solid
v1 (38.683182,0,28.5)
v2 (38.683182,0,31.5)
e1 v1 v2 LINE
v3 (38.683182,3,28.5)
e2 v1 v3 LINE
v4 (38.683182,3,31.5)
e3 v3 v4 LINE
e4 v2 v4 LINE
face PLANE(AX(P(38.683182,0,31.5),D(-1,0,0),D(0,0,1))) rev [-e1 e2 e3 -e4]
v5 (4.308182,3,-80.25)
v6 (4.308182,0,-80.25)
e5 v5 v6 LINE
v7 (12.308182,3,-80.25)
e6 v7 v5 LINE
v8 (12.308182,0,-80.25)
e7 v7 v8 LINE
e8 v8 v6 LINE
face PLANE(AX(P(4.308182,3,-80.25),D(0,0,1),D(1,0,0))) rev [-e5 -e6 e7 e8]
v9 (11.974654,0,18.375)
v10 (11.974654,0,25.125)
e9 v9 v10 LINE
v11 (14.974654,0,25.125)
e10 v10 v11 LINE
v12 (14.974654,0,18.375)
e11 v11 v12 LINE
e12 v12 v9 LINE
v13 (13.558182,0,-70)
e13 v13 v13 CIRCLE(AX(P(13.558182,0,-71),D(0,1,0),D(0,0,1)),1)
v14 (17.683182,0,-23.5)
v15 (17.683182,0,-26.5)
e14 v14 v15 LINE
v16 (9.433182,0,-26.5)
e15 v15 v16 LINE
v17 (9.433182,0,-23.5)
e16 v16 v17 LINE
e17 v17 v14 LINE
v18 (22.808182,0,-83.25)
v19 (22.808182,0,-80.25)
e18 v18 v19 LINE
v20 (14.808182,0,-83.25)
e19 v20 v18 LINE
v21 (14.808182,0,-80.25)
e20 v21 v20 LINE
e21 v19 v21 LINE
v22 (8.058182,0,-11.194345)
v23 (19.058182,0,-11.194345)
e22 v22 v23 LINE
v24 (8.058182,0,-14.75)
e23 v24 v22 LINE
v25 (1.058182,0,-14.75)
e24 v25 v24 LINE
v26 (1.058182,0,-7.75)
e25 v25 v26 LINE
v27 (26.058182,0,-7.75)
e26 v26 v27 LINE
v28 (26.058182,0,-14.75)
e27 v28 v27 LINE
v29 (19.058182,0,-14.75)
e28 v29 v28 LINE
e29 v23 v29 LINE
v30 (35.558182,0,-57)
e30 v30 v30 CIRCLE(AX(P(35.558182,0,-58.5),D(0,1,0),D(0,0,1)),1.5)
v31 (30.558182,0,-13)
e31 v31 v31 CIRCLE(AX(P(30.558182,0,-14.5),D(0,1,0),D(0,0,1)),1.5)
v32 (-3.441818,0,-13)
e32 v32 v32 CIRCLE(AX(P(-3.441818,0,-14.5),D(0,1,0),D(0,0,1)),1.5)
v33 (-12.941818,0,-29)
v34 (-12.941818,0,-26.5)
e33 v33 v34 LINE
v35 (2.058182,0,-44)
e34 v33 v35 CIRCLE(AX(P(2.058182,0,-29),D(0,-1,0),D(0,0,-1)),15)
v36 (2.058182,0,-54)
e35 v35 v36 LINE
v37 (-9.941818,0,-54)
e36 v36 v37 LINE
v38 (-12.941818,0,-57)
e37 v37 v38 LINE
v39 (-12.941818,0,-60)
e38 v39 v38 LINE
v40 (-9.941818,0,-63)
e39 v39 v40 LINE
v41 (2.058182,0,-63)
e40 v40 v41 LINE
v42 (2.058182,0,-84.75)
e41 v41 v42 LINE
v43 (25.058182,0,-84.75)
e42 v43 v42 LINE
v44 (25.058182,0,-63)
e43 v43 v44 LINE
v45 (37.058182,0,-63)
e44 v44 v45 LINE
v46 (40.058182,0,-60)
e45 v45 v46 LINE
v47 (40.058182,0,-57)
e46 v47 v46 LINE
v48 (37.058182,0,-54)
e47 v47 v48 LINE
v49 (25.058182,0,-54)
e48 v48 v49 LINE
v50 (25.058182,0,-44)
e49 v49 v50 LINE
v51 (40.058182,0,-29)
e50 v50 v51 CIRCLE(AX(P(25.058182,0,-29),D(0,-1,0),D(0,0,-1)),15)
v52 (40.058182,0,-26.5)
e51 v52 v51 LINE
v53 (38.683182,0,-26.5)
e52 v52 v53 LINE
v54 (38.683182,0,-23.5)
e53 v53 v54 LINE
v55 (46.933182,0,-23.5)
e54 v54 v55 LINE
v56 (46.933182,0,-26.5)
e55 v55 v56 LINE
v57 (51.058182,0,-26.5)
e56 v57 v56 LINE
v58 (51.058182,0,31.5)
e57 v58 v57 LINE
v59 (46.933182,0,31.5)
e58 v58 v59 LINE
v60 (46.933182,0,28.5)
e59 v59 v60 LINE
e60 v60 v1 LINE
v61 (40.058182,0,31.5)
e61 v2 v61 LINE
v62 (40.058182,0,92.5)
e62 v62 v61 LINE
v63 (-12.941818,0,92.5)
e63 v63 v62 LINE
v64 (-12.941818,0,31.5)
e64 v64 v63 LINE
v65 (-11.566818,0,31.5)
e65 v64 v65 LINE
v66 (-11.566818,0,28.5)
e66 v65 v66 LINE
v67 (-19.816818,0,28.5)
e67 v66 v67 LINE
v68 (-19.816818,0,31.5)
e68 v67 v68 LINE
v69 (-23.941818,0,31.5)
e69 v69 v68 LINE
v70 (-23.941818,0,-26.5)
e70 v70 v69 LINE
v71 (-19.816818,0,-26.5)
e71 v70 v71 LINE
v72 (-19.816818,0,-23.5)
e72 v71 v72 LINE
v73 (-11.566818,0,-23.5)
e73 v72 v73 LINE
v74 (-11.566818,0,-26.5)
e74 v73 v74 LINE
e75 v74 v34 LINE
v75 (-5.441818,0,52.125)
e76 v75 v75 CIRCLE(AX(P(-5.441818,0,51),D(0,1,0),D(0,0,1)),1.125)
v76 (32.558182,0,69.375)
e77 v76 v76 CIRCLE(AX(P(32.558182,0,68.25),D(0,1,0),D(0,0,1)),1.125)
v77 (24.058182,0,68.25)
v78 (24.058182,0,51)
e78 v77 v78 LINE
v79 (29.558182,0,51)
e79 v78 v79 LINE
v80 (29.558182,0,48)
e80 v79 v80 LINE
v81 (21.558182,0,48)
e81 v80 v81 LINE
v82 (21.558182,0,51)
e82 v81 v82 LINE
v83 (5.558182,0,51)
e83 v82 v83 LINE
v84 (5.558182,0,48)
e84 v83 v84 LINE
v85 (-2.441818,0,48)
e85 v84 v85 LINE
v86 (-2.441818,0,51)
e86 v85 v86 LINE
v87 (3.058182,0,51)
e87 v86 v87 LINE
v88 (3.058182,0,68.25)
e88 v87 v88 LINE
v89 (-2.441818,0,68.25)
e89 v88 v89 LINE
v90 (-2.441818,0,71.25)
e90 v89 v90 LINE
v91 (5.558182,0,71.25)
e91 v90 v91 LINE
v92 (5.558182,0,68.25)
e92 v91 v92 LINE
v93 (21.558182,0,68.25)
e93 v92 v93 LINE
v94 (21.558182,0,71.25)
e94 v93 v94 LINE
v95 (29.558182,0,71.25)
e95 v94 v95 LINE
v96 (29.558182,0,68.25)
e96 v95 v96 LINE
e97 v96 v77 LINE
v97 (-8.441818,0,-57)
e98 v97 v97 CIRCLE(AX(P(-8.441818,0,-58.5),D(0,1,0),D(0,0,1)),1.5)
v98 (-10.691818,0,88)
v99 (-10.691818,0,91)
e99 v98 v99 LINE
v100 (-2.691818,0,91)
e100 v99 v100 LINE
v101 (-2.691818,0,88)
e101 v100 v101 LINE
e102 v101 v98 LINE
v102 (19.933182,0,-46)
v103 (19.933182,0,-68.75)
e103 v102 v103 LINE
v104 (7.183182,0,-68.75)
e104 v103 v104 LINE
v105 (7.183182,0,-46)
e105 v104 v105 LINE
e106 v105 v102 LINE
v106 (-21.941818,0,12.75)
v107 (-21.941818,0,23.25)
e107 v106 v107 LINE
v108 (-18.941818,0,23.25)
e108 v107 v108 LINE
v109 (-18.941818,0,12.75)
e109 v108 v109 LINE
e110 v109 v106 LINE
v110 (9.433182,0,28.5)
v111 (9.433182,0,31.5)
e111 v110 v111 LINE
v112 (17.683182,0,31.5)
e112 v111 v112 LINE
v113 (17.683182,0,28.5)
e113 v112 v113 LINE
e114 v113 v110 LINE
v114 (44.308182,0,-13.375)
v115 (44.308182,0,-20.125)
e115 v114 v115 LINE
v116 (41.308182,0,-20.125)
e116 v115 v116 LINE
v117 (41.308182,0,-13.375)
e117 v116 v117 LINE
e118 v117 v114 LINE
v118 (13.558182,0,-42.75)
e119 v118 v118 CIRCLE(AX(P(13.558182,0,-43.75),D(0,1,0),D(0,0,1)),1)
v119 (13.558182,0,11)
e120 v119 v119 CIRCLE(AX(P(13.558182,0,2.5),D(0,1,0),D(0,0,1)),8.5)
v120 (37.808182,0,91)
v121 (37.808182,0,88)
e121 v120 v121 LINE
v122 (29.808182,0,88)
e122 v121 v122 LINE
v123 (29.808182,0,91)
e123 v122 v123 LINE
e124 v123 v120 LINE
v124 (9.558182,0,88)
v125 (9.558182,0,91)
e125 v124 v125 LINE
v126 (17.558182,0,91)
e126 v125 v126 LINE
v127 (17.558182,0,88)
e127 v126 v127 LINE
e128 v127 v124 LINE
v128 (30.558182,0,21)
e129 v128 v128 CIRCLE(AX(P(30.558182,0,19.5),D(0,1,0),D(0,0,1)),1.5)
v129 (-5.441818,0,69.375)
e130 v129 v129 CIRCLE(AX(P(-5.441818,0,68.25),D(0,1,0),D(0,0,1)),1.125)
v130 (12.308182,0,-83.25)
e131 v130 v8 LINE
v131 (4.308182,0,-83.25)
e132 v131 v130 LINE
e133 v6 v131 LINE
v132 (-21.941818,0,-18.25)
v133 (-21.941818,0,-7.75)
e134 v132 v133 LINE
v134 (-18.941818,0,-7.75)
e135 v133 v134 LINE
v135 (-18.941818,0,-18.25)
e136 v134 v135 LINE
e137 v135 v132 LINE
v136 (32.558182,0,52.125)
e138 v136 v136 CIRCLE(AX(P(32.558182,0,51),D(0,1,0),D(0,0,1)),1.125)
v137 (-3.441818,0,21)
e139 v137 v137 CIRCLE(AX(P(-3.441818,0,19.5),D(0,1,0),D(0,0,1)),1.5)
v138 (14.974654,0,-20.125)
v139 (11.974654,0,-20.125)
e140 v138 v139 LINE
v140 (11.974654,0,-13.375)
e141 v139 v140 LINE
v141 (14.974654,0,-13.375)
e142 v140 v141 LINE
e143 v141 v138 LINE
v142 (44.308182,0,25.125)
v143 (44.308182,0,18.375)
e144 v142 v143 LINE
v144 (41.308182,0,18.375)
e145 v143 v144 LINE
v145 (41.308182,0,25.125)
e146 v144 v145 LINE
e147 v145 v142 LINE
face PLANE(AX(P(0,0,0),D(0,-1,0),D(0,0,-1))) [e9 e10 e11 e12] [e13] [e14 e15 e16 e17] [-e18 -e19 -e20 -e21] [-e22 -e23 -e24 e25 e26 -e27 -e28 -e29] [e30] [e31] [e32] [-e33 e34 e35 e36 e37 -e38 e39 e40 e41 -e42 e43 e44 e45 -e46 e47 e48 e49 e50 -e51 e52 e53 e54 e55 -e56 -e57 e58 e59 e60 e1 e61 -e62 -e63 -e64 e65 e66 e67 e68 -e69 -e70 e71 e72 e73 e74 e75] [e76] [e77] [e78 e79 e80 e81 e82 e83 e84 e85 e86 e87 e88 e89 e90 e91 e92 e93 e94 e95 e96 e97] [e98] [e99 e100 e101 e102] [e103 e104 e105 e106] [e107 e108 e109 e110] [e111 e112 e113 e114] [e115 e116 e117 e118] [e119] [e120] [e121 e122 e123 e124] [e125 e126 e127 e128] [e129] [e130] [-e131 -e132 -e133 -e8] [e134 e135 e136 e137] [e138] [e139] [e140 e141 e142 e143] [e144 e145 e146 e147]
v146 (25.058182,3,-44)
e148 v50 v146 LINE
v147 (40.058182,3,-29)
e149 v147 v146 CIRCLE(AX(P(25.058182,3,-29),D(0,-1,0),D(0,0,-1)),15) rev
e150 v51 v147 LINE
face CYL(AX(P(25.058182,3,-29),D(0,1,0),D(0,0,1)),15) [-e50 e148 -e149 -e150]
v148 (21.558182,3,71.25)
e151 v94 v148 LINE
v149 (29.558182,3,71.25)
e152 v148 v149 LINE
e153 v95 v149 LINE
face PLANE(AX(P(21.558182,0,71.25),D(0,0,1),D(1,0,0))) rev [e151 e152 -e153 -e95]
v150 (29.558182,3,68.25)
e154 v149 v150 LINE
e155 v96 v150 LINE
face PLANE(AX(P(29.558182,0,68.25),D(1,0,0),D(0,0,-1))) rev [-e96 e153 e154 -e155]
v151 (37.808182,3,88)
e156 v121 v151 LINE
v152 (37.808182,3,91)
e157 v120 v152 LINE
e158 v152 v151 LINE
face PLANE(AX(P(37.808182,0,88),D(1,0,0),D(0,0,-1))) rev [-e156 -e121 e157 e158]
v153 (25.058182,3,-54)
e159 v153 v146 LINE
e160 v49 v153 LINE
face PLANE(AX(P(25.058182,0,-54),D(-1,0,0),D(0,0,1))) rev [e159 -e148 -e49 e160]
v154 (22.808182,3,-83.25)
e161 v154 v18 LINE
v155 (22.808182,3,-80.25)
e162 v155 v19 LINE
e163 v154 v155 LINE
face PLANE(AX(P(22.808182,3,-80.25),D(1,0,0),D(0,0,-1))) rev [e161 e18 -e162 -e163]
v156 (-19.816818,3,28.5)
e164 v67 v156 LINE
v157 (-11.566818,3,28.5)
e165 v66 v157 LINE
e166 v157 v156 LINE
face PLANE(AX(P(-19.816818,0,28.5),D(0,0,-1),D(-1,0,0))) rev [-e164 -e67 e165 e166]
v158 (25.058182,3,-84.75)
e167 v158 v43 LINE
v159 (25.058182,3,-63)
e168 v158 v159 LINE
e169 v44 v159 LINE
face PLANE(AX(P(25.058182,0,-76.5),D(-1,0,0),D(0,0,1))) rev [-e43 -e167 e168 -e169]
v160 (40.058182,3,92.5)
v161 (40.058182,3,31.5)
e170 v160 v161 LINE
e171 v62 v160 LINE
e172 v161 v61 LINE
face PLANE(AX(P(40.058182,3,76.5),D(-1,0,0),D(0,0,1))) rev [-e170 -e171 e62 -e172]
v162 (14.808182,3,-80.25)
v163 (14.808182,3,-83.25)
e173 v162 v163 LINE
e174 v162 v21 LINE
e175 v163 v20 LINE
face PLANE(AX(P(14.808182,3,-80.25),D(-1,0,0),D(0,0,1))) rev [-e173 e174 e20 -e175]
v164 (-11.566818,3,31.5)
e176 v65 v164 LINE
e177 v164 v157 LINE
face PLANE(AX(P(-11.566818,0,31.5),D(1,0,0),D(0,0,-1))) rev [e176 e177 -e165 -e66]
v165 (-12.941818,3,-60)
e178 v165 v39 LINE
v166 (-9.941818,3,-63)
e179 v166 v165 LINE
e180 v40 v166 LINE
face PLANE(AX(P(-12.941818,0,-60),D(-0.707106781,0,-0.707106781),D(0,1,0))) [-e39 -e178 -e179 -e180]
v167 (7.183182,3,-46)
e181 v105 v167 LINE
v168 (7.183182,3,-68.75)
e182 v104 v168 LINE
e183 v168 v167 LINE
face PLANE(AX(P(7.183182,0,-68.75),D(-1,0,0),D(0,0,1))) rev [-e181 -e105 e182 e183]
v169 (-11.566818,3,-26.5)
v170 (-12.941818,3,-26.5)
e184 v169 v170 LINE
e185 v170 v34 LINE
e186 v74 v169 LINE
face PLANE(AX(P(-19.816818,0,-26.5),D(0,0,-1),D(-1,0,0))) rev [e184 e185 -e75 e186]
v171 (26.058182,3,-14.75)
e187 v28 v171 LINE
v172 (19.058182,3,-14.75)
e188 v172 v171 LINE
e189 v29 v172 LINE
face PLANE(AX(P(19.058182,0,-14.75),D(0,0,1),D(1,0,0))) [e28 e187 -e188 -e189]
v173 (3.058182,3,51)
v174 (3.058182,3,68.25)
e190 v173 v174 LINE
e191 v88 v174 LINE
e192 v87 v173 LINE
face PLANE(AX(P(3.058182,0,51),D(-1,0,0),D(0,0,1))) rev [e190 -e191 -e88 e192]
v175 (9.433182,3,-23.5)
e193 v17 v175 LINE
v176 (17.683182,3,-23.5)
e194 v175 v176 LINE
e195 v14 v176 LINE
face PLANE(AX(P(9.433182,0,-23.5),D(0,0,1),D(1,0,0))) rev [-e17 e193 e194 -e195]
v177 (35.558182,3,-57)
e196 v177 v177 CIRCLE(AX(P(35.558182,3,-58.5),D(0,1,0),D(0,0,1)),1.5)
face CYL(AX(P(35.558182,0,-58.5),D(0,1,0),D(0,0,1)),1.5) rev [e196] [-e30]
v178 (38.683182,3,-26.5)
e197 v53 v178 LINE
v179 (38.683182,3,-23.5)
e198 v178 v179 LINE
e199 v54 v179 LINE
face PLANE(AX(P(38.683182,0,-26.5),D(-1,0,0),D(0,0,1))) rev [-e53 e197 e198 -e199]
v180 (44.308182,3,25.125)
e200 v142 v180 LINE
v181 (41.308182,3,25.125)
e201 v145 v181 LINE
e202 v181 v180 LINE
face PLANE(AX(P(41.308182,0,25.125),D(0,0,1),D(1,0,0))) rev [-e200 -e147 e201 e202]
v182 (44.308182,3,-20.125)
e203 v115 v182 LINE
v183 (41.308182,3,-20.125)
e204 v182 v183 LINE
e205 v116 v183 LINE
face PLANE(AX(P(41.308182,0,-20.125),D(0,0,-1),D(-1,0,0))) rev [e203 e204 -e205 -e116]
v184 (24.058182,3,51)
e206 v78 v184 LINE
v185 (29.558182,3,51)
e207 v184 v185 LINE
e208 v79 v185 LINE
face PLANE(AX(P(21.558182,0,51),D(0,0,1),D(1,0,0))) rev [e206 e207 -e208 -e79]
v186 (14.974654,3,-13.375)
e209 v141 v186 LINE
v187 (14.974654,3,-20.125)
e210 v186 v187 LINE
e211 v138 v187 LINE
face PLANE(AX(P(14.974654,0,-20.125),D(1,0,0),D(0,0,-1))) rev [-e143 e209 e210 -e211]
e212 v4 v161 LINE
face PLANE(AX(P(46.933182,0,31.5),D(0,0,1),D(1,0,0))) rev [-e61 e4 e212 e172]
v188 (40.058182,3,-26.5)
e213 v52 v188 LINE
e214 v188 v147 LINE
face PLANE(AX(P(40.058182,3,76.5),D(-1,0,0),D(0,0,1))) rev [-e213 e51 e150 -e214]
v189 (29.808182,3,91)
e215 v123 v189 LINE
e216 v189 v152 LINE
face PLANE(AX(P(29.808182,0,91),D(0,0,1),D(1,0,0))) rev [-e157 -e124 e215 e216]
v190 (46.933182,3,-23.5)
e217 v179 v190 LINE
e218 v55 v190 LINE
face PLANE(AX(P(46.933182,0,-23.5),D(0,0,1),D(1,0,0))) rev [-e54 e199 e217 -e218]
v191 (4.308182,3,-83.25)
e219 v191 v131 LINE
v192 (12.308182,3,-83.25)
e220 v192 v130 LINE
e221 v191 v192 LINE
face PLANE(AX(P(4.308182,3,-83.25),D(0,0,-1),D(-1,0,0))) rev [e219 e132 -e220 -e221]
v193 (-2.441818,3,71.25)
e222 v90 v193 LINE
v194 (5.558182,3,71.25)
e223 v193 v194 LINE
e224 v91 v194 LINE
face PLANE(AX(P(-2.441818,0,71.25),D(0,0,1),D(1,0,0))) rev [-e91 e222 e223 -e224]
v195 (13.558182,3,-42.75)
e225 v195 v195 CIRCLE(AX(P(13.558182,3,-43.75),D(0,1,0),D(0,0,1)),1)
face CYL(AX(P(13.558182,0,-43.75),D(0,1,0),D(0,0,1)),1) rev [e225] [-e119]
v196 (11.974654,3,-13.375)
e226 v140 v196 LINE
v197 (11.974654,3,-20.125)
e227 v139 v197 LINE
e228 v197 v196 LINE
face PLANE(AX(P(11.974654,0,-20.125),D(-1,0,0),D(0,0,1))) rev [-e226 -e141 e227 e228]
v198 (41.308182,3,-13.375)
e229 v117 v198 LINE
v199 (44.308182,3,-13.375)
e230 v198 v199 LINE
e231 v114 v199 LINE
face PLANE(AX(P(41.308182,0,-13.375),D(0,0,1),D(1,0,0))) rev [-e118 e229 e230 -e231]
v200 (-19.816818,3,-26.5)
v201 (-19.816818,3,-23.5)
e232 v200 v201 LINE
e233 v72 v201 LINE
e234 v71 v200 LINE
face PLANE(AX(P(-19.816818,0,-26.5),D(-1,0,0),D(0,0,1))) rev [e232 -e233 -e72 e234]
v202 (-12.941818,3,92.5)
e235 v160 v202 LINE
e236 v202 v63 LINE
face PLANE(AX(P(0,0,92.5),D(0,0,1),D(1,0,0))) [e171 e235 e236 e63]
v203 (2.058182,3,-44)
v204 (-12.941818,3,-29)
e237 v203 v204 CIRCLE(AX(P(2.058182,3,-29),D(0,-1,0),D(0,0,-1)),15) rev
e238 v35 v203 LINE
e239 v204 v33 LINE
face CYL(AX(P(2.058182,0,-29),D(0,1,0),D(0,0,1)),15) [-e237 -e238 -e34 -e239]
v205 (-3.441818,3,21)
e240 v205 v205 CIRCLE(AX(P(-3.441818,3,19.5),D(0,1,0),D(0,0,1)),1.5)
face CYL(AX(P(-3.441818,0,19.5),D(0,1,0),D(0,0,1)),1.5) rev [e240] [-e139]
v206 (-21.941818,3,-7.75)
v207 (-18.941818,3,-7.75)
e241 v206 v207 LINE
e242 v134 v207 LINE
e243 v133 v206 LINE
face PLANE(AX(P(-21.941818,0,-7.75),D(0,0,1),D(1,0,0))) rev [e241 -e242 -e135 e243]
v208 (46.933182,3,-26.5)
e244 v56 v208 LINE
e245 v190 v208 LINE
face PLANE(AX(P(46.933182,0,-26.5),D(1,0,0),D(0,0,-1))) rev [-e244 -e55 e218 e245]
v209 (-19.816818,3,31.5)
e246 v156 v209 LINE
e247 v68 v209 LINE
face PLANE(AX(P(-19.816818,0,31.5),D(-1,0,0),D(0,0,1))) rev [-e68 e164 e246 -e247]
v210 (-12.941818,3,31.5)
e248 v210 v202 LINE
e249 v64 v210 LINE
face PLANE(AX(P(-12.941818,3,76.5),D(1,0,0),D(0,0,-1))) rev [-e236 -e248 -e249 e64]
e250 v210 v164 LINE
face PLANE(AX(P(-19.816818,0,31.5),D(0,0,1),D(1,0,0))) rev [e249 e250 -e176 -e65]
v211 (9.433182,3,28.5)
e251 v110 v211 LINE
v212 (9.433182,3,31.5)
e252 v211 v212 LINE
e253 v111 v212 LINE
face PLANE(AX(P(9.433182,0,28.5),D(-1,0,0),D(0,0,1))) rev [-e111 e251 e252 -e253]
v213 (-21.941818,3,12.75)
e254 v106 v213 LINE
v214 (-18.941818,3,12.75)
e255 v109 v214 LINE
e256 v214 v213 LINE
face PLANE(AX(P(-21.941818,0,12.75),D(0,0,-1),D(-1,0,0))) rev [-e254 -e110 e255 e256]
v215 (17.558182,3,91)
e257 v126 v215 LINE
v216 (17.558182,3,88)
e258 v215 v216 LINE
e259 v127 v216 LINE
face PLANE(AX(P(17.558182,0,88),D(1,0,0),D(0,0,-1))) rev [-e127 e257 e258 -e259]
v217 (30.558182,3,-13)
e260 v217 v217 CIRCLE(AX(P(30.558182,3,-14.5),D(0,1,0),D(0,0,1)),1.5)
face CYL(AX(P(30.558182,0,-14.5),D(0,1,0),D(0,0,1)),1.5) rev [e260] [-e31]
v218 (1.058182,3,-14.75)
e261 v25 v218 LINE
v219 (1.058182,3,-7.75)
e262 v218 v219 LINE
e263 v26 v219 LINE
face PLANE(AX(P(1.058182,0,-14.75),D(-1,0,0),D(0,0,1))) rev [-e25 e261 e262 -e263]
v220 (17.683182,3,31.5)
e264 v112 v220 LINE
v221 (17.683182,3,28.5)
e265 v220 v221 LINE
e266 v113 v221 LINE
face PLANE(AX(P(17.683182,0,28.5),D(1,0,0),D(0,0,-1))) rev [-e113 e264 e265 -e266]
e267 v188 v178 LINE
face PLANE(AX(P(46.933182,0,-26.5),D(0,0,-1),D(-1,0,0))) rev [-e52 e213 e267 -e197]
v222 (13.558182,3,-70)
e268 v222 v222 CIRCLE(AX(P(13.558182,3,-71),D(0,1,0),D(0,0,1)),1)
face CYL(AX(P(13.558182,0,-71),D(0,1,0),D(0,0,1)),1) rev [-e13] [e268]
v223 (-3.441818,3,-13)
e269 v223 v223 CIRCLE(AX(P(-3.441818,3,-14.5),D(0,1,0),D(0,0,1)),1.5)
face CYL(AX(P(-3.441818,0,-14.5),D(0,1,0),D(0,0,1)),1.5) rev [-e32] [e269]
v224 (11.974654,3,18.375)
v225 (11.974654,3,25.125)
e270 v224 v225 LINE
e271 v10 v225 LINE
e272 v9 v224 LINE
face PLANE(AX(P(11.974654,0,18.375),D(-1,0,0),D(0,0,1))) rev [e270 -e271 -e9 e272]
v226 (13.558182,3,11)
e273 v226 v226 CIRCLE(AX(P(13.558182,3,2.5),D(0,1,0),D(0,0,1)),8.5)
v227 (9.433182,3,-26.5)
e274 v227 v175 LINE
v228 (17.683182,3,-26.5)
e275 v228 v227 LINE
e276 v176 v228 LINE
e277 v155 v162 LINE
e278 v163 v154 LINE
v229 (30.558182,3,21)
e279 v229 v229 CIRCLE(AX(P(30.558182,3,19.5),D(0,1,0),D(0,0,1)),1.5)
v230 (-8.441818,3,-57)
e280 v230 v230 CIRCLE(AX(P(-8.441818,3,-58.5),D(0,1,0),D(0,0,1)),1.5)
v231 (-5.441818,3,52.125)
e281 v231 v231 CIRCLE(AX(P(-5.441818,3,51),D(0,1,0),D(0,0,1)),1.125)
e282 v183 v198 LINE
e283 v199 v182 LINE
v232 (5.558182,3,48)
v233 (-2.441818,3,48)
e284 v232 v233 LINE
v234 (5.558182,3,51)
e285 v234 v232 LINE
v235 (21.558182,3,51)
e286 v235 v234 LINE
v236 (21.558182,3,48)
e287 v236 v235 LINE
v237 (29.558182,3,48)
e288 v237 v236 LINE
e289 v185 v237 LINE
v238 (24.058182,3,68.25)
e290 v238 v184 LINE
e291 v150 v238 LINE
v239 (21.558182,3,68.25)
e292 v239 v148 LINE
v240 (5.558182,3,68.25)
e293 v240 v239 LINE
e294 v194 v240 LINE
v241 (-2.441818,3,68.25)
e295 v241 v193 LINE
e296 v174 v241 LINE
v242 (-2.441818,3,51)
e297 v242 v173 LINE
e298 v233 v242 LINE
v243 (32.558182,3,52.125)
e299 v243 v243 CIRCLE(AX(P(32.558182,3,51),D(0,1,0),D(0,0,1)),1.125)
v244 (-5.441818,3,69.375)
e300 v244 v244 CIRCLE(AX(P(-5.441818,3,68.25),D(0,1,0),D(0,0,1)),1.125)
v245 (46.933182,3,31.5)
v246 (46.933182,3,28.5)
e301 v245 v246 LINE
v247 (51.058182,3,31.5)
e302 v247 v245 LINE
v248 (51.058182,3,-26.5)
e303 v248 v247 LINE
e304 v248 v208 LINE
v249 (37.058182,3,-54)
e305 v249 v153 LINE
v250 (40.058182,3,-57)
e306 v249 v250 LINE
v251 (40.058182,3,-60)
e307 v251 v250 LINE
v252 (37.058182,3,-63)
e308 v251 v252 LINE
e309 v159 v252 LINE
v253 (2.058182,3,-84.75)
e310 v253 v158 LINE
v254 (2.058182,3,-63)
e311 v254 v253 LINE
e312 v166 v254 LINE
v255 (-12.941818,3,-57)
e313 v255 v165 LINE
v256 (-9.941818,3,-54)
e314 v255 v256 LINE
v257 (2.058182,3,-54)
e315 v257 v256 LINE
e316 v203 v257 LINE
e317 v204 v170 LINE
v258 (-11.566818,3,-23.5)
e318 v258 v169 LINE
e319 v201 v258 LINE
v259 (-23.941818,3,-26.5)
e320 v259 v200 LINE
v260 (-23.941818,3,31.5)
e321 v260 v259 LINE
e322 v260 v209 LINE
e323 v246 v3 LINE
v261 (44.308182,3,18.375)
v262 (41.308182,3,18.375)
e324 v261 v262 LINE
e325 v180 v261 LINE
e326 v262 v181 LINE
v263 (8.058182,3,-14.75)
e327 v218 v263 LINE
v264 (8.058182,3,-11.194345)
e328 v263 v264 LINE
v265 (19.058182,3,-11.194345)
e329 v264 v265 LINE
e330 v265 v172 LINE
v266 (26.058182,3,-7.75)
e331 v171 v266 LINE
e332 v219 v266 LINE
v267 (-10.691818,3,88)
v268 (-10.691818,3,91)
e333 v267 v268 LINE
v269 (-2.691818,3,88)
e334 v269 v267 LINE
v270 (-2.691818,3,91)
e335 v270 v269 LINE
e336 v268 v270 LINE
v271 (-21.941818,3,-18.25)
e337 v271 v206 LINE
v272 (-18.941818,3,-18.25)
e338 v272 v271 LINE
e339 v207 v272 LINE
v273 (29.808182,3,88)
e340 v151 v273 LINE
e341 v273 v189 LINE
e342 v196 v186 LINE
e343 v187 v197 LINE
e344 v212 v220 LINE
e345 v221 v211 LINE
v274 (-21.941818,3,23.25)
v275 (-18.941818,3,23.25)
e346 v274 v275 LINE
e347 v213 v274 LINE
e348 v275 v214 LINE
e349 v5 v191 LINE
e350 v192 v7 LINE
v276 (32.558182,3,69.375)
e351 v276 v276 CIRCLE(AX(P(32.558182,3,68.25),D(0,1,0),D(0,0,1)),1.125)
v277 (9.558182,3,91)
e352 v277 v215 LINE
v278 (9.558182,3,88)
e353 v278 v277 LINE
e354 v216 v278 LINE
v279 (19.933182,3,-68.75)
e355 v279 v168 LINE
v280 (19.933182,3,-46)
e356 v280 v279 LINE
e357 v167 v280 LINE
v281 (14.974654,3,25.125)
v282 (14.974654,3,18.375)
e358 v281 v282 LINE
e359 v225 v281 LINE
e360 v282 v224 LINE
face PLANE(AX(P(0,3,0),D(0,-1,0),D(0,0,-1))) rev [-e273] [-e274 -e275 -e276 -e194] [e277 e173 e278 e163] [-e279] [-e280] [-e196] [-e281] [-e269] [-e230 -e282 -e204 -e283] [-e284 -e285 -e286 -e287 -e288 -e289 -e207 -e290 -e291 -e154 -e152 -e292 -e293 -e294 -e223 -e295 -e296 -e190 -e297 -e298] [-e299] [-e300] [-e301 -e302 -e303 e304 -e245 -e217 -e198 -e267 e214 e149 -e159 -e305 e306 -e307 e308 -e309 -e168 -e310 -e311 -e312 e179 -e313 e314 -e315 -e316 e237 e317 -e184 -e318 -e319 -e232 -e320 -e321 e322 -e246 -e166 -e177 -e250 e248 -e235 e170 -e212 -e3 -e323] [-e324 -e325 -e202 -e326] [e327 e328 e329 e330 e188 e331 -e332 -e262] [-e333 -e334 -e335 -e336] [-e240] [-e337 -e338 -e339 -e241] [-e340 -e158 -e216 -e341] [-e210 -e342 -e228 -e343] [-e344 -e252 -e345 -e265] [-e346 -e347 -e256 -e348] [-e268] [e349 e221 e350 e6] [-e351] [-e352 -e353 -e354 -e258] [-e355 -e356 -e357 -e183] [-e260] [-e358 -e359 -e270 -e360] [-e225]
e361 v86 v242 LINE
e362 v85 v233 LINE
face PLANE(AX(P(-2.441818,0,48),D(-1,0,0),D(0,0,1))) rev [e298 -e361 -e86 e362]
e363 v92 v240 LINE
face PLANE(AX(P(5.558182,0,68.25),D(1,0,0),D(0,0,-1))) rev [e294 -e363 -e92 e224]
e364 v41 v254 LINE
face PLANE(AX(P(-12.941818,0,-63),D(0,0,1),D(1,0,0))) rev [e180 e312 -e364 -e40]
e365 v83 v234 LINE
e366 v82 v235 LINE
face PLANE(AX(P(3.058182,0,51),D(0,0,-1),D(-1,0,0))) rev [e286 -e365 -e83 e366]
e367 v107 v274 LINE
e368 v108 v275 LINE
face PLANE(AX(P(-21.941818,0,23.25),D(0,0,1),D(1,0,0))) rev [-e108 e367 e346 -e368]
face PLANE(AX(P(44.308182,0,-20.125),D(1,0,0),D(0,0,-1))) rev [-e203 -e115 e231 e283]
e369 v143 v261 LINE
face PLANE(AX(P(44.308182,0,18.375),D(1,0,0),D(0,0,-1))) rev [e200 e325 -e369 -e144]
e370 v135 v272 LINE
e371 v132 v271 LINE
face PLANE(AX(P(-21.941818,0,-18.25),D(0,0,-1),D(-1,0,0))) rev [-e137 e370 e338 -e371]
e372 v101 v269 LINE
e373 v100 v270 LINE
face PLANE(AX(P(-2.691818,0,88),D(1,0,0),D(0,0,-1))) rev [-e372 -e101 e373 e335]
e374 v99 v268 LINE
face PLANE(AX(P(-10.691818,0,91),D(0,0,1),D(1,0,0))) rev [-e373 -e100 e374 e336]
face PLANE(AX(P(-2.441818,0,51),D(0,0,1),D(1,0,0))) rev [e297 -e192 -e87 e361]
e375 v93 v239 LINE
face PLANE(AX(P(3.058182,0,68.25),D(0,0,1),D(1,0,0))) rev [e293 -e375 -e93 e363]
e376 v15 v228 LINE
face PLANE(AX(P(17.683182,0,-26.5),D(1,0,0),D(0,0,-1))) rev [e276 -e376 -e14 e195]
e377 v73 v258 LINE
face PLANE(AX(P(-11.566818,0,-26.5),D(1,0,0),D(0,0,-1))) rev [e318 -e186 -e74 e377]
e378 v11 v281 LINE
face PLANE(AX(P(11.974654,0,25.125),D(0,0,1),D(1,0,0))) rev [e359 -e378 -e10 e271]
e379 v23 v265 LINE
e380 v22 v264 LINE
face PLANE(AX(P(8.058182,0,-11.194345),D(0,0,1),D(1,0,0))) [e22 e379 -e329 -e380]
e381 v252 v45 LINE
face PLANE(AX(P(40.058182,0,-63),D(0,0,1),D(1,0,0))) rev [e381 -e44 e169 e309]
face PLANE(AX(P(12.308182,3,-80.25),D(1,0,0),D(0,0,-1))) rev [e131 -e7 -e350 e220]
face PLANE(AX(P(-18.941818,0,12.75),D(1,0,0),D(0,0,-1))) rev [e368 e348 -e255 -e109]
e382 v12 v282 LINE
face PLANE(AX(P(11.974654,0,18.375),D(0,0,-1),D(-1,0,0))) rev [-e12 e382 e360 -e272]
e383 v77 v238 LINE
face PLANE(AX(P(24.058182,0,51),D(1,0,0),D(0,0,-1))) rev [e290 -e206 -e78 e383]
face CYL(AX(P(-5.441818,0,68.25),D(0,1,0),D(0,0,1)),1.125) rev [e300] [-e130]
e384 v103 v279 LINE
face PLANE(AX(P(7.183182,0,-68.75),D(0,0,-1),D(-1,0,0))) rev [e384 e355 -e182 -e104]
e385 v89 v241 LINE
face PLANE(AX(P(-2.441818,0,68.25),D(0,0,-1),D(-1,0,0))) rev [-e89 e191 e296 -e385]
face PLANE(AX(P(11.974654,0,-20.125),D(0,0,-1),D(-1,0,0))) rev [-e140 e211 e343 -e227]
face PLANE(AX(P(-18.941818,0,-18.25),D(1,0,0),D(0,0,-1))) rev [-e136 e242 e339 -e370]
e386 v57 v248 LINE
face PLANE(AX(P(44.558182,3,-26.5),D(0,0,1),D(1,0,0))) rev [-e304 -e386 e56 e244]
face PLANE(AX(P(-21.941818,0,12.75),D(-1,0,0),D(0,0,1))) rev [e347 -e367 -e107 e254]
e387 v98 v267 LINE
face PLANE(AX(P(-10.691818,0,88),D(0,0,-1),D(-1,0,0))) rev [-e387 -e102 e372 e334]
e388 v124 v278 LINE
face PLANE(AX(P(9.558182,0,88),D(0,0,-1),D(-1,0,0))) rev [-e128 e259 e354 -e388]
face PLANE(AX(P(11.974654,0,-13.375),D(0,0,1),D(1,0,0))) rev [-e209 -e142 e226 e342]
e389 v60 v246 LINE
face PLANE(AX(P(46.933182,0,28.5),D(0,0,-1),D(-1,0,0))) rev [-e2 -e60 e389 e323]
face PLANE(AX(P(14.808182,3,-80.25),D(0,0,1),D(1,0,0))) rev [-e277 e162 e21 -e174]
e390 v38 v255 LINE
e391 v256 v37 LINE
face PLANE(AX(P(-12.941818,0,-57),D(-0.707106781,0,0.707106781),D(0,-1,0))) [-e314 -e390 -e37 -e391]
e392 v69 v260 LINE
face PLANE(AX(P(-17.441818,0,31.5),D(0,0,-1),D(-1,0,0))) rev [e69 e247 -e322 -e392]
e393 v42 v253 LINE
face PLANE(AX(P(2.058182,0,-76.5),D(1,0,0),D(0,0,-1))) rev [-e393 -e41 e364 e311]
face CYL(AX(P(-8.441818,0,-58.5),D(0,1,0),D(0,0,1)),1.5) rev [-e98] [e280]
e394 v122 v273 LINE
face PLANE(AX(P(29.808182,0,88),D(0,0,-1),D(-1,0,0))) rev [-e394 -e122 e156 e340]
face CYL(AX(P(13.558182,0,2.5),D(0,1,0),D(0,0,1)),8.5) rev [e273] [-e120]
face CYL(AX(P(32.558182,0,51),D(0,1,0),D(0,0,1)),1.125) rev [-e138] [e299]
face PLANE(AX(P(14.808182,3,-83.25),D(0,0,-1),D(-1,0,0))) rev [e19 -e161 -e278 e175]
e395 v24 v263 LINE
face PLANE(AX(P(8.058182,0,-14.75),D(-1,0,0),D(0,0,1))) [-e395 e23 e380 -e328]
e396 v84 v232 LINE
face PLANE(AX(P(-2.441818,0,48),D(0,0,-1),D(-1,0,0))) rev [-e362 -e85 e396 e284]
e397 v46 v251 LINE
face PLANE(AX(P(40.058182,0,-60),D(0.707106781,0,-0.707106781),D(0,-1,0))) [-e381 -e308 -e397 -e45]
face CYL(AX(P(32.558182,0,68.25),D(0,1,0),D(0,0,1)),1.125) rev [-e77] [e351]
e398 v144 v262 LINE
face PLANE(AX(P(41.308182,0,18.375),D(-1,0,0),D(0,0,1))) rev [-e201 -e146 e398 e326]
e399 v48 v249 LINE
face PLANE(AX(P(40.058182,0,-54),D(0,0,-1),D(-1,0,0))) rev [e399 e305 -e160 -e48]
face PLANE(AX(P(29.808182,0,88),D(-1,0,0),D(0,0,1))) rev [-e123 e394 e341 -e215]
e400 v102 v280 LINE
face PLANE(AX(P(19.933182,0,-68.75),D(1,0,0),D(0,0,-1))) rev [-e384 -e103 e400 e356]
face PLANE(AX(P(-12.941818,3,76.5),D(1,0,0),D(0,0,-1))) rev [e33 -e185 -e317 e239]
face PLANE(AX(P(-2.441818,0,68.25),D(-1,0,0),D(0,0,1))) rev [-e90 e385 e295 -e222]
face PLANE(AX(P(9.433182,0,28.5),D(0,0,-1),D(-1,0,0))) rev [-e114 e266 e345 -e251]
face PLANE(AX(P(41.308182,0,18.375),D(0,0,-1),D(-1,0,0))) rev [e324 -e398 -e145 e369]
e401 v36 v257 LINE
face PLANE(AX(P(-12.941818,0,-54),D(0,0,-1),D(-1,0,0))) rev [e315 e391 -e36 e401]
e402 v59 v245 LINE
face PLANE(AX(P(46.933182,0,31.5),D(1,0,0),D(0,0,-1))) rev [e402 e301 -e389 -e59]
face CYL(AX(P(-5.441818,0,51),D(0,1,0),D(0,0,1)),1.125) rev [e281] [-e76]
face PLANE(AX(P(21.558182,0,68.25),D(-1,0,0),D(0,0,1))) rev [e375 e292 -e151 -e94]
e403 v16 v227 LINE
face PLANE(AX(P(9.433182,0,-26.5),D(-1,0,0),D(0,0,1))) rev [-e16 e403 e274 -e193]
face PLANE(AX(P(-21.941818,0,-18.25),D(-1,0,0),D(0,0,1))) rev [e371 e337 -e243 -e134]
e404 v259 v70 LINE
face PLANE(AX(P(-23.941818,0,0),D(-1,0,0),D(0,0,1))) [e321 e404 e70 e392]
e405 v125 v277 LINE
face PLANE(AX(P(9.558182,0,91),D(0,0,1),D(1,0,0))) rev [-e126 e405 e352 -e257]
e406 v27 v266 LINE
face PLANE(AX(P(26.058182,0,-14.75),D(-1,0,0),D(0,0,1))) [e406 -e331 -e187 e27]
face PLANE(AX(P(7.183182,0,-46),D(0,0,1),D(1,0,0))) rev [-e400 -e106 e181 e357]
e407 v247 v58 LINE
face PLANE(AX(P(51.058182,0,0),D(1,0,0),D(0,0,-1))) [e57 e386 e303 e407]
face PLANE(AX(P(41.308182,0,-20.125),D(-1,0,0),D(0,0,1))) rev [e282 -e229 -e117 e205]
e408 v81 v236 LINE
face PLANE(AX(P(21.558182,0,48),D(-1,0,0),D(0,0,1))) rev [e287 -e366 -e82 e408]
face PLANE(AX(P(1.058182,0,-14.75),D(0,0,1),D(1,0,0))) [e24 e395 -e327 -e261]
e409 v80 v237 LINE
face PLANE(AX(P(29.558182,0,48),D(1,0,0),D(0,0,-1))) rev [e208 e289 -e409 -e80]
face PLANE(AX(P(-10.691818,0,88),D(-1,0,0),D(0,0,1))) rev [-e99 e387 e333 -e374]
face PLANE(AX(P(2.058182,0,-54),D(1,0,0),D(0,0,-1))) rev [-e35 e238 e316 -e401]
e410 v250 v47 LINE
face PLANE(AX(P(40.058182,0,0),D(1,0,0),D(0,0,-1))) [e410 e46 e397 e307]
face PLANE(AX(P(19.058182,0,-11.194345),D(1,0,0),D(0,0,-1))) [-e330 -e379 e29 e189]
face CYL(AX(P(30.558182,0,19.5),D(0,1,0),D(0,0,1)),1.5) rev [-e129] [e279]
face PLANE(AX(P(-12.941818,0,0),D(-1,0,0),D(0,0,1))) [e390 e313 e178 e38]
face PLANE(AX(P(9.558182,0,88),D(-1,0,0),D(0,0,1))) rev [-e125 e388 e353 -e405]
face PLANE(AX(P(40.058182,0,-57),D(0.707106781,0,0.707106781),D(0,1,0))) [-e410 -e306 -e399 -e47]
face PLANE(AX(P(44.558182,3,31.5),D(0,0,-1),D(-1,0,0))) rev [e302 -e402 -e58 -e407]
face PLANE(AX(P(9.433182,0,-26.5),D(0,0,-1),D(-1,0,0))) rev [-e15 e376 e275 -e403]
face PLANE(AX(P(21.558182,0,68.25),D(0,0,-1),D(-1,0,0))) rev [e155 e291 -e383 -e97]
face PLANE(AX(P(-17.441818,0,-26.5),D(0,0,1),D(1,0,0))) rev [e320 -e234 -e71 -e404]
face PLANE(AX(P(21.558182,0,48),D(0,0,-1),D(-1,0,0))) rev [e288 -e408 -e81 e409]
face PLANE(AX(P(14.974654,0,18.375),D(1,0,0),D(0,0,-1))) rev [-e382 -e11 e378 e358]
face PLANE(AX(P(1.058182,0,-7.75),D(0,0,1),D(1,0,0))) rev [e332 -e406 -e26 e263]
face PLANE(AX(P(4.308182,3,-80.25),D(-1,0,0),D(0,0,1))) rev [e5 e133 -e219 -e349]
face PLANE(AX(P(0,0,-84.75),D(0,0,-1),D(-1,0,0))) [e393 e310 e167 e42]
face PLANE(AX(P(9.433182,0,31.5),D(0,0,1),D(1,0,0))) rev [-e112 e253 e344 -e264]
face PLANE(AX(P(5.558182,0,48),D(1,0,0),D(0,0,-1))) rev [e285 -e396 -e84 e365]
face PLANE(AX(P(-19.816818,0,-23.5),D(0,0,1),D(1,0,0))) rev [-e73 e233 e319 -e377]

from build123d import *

# Parameters (mm, degrees)
SKETCH1_W            = 53
SKETCH1_H            = 153
BOSS_EXTRUDE1_DEPTH  = 3
SKETCH2_R            = 1.125
CUT_EXTRUDE1_DEPTH   = 3
SKETCH4_W            = 58
SKETCH4_H            = 3
BOSS_EXTRUDE3_DEPTH  = 4.5
SKETCH5_W            = 58
SKETCH5_H            = 3
BOSS_EXTRUDE4_DEPTH  = 4.5
SKETCH8_W            = 15
SKETCH8_H            = 13.5
CUT_EXTRUDE3_DEPTH   = 3
SKETCH9_W            = 6
SKETCH9_H            = 9
CUT_EXTRUDE4_DEPTH   = 3
SKETCH10_W           = 15
SKETCH10_H           = 10
CUT_EXTRUDE5_DEPTH   = 3
SKETCH11_W           = 12.75
SKETCH11_H           = 22.75
CUT_EXTRUDE6_DEPTH   = 3
SKETCH12_R           = 1
CUT_EXTRUDE7_DEPTH   = 3
SKETCH17_W           = 9
SKETCH17_H           = 3
BOSS_EXTRUDE6_DEPTH  = 6
SKETCH18_W           = 9
SKETCH18_H           = 3
BOSS_EXTRUDE8_DEPTH  = 6
SKETCH19_R           = 1.5
CUT_EXTRUDE11_DEPTH  = 3
SKETCH20_W           = 58
SKETCH20_H           = 3
BOSS_EXTRUDE9_DEPTH  = 6.5
SKETCH21_W           = 58
SKETCH21_H           = 3
BOSS_EXTRUDE10_DEPTH = 6.5
SKETCH29_W           = 8
SKETCH29_H           = 3
CUT_EXTRUDE15_DEPTH  = 3
SKETCH33_W           = 21
SKETCH33_H           = 17.25
CUT_EXTRUDE20_DEPTH  = 3
CHAMFER1_SIZE        = 3
CHAMFER2_SIZE        = 3
CHAMFER3_SIZE        = 3
CHAMFER4_SIZE        = 3
SKETCH34_W           = 8.25
SKETCH34_H           = 3
CUT_EXTRUDE21_DEPTH  = 3
SKETCH35_W           = 3
SKETCH35_H           = 6.75
CUT_EXTRUDE22_DEPTH  = 3
SKETCH36_W           = 3
SKETCH36_H           = 6.75
CUT_EXTRUDE23_DEPTH  = 3
SKETCH37_W           = 3
SKETCH37_H           = 10.5
CUT_EXTRUDE24_DEPTH  = 3
FILLET1_R            = 15
FILLET2_R            = 15
SKETCH38_W           = 23
SKETCH38_H           = 3
BOSS_EXTRUDE12_DEPTH = 8.25
SKETCH39_W           = 8
SKETCH39_H           = 3
CUT_EXTRUDE25_DEPTH  = 3
SKETCH40_W           = 53
SKETCH40_H           = 3
BOSS_EXTRUDE13_DEPTH = 16
SKETCH41_W           = 8
SKETCH41_H           = 3
CUT_EXTRUDE26_DEPTH  = 3
SKETCH42_R           = 8.5
SKETCH42_R_2         = 1.5
CUT_EXTRUDE30_DEPTH  = 3


with BuildPart() as part:
    # Sketch1 → Boss-Extrude1 (new body)
    with BuildSketch(Plane(origin=(0, 0, 0), x_dir=(1, 0, 0), z_dir=(0, 1, 0))):
        with Locations((13.558181818, 0)):
            Rectangle(SKETCH1_W, SKETCH1_H)
    extrude(amount=BOSS_EXTRUDE1_DEPTH)

    # Sketch2 → Cut-Extrude1 (cut)
    with BuildSketch(Plane(origin=(0, 3, 0), x_dir=(1, 0, 0), z_dir=(0, 1, 0))):
        with Locations(Location((-5.441818182, -68.25, 0), (0, 0, 270))):
            Circle(SKETCH2_R)
        with Locations(Location((-5.441818182, -51, 0), (0, 0, 270))):
            Circle(SKETCH2_R)
        with Locations(Location((32.558181818, -68.25, 0), (0, 0, 270))):
            Circle(SKETCH2_R)
        with Locations(Location((32.558181818, -51, 0), (0, 0, 270))):
            Circle(SKETCH2_R)
    extrude(amount=-CUT_EXTRUDE1_DEPTH, mode=Mode.SUBTRACT)

    # Sketch4 → Boss-Extrude3 (add)
    with BuildSketch(Plane(origin=(40.058181818, 0, 0), x_dir=(0, 0, -1), z_dir=(1, 0, 0))):
        with Locations((-2.5, 1.5)):
            Rectangle(SKETCH4_W, SKETCH4_H)
    extrude(amount=BOSS_EXTRUDE3_DEPTH)

    # Sketch5 → Boss-Extrude4 (add)
    with BuildSketch(Plane.ZY.offset(12.941818182)):
        with Locations((2.5, 1.5)):
            Rectangle(SKETCH5_W, SKETCH5_H)
    extrude(amount=BOSS_EXTRUDE4_DEPTH)

    # Sketch8 → Cut-Extrude3 (cut)
    with BuildSketch(Plane(origin=(0, 3, 0), x_dir=(1, 0, 0), z_dir=(0, 1, 0))):
        with Locations((-5.441818182, 69.75)):
            Rectangle(SKETCH8_W, SKETCH8_H)
        with Locations((32.558181818, 69.75)):
            Rectangle(SKETCH8_W, SKETCH8_H)
    extrude(amount=-CUT_EXTRUDE3_DEPTH, mode=Mode.SUBTRACT)

    # Sketch9 → Cut-Extrude4 (cut)
    with BuildSketch(Plane(origin=(0, 3, 0), x_dir=(1, 0, 0), z_dir=(0, 1, 0))):
        with Locations((-9.941818182, 58.5)):
            Rectangle(SKETCH9_W, SKETCH9_H)
        with Locations((37.058181818, 58.5)):
            Rectangle(SKETCH9_W, SKETCH9_H)
    extrude(amount=-CUT_EXTRUDE4_DEPTH, mode=Mode.SUBTRACT)

    # Sketch10 → Cut-Extrude5 (cut)
    with BuildSketch(Plane(origin=(0, 3, 0), x_dir=(1, 0, 0), z_dir=(0, 1, 0))):
        with Locations((-5.441818182, 49)):
            Rectangle(SKETCH10_W, SKETCH10_H)
        with Locations((32.558181818, 49)):
            Rectangle(SKETCH10_W, SKETCH10_H)
    extrude(amount=-CUT_EXTRUDE5_DEPTH, mode=Mode.SUBTRACT)

    # Sketch11 → Cut-Extrude6 (cut)
    with BuildSketch(Plane(origin=(0, 3, 0), x_dir=(1, 0, 0), z_dir=(0, 1, 0))):
        with Locations((13.558181818, 57.375)):
            Rectangle(SKETCH11_W, SKETCH11_H)
    extrude(amount=-CUT_EXTRUDE6_DEPTH, mode=Mode.SUBTRACT)

    # Sketch12 → Cut-Extrude7 (cut)
    with BuildSketch(Plane(origin=(0, 3, 0), x_dir=(1, 0, 0), z_dir=(0, 1, 0))):
        with Locations(Location((13.558181818, 71, 0), (0, 0, 270))):
            Circle(SKETCH12_R)
        with Locations(Location((13.558181818, 43.75, 0), (0, 0, 270))):
            Circle(SKETCH12_R)
    extrude(amount=-CUT_EXTRUDE7_DEPTH, mode=Mode.SUBTRACT)

    # Sketch17 → Boss-Extrude6 (add)
    with BuildSketch(Plane.ZY.offset(6.941818182)):
        with Locations((-58.5, 1.5)):
            Rectangle(SKETCH17_W, SKETCH17_H)
    extrude(amount=BOSS_EXTRUDE6_DEPTH)

    # Sketch18 → Boss-Extrude8 (add)
    with BuildSketch(Plane(origin=(34.058181818, 0, 0), x_dir=(0, 0, -1), z_dir=(1, 0, 0))):
        with Locations((58.5, 1.5)):
            Rectangle(SKETCH18_W, SKETCH18_H)
    extrude(amount=BOSS_EXTRUDE8_DEPTH)

    # Sketch19 → Cut-Extrude11 (cut)
    with BuildSketch(Plane(origin=(0, 3, 0), x_dir=(1, 0, 0), z_dir=(0, 1, 0))):
        with Locations(Location((35.558181818, 58.5, 0), (0, 0, 270))):
            Circle(SKETCH19_R)
        with Locations(Location((-8.441818182, 58.5, 0), (0, 0, 270))):
            Circle(SKETCH19_R)
    extrude(amount=-CUT_EXTRUDE11_DEPTH, mode=Mode.SUBTRACT)

    # Sketch20 → Boss-Extrude9 (add)
    with BuildSketch(Plane(origin=(44.558181818, 0, 0), x_dir=(0, 0, -1), z_dir=(1, 0, 0))):
        with Locations((-2.5, 1.5)):
            Rectangle(SKETCH20_W, SKETCH20_H)
    extrude(amount=BOSS_EXTRUDE9_DEPTH)

    # Sketch21 → Boss-Extrude10 (add)
    with BuildSketch(Plane.ZY.offset(17.441818182)):
        with Locations((2.5, 1.5)):
            Rectangle(SKETCH21_W, SKETCH21_H)
    extrude(amount=BOSS_EXTRUDE10_DEPTH)

    # Sketch29 → Cut-Extrude15 (cut)
    with BuildSketch(Plane(origin=(0, 3, 0), x_dir=(1, 0, 0), z_dir=(0, 1, 0))):
        with Locations((1.558181818, -49.5)):
            Rectangle(SKETCH29_W, SKETCH29_H)
        with Locations((1.558181818, -69.75)):
            Rectangle(SKETCH29_W, SKETCH29_H)
        with Locations((25.558181818, -49.5)):
            Rectangle(SKETCH29_W, SKETCH29_H)
        with Locations((25.558181818, -69.75)):
            Rectangle(SKETCH29_W, SKETCH29_H)
    extrude(amount=-CUT_EXTRUDE15_DEPTH, mode=Mode.SUBTRACT)

    # Sketch33 → Cut-Extrude20 (cut)
    with BuildSketch(Plane(origin=(0, 3, 0), x_dir=(1, 0, 0), z_dir=(0, 1, 0))):
        with Locations((13.558181818, -59.625)):
            Rectangle(SKETCH33_W, SKETCH33_H)
    extrude(amount=-CUT_EXTRUDE20_DEPTH, mode=Mode.SUBTRACT)

    # Chamfer1
    chamfer1_edges = [part.edges().sort_by_distance(p)[0] for p in [
        (-12.941818182, 1.5, -54),
    ]]
    chamfer(chamfer1_edges, length=CHAMFER1_SIZE)

    # Chamfer2
    chamfer2_edges = [part.edges().sort_by_distance(p)[0] for p in [
        (-12.941818182, 1.5, -63),
    ]]
    chamfer(chamfer2_edges, length=CHAMFER2_SIZE)

    # Chamfer3
    chamfer3_edges = [part.edges().sort_by_distance(p)[0] for p in [
        (40.058181818, 1.5, -54),
    ]]
    chamfer(chamfer3_edges, length=CHAMFER3_SIZE)

    # Chamfer4
    chamfer4_edges = [part.edges().sort_by_distance(p)[0] for p in [
        (40.058181818, 1.5, -63),
    ]]
    chamfer(chamfer4_edges, length=CHAMFER4_SIZE)

    # Sketch34 → Cut-Extrude21 (cut)
    with BuildSketch(Plane(origin=(0, 3, 0), x_dir=(1, 0, 0), z_dir=(0, 1, 0))):
        with Locations((-15.691818182, 25)):
            Rectangle(SKETCH34_W, SKETCH34_H)
        with Locations((42.808181818, 25)):
            Rectangle(SKETCH34_W, SKETCH34_H)
        with Locations((-15.691818182, -30)):
            Rectangle(SKETCH34_W, SKETCH34_H)
        with Locations((42.808181818, -30)):
            Rectangle(SKETCH34_W, SKETCH34_H)
        with Locations((13.558181818, -30)):
            Rectangle(SKETCH34_W, SKETCH34_H)
        with Locations((13.558181818, 25)):
            Rectangle(SKETCH34_W, SKETCH34_H)
    extrude(amount=-CUT_EXTRUDE21_DEPTH, mode=Mode.SUBTRACT)

    # Sketch35 → Cut-Extrude22 (cut)
    with BuildSketch(Plane(origin=(0, 3, 0), x_dir=(1, 0, 0), z_dir=(0, 1, 0))):
        with Locations((42.808181818, 16.75)):
            Rectangle(SKETCH35_W, SKETCH35_H)
        with Locations((42.808181818, -21.75)):
            Rectangle(SKETCH35_W, SKETCH35_H)
    extrude(amount=-CUT_EXTRUDE22_DEPTH, mode=Mode.SUBTRACT)

    # Sketch36 → Cut-Extrude23 (cut)
    with BuildSketch(Plane(origin=(0, 3, 0), x_dir=(1, 0, 0), z_dir=(0, 1, 0))):
        with Locations((13.474653765, 16.75)):
            Rectangle(SKETCH36_W, SKETCH36_H)
        with Locations((13.474653765, -21.75)):
            Rectangle(SKETCH36_W, SKETCH36_H)
    extrude(amount=-CUT_EXTRUDE23_DEPTH, mode=Mode.SUBTRACT)

    # Sketch37 → Cut-Extrude24 (cut)
    with BuildSketch(Plane(origin=(0, 3, 0), x_dir=(1, 0, 0), z_dir=(0, 1, 0))):
        with Locations((-20.441818182, 13)):
            Rectangle(SKETCH37_W, SKETCH37_H)
        with Locations((-20.441818182, -18)):
            Rectangle(SKETCH37_W, SKETCH37_H)
    extrude(amount=-CUT_EXTRUDE24_DEPTH, mode=Mode.SUBTRACT)

    # Fillet1
    fillet1_edges = [part.edges().sort_by_distance(p)[0] for p in [
        (-12.941818182, 1.5, -44),
    ]]
    fillet(fillet1_edges, radius=FILLET1_R - 0.0001)  # a hair under: the kernel refuses the full size

    # Fillet2
    fillet2_edges = [part.edges().sort_by_distance(p)[0] for p in [
        (40.058181818, 1.5, -44),
    ]]
    fillet(fillet2_edges, radius=FILLET2_R - 0.0001)  # a hair under: the kernel refuses the full size

    # Sketch38 → Boss-Extrude12 (add)
    with BuildSketch(Plane(origin=(0, 0, -76.5), x_dir=(-1, 0, 0), z_dir=(0, 0, -1))):
        with Locations((-13.558181818, 1.5)):
            Rectangle(SKETCH38_W, SKETCH38_H)
    extrude(amount=BOSS_EXTRUDE12_DEPTH)

    # Sketch39 → Cut-Extrude25 (cut)
    with BuildSketch(Plane(origin=(0, 0, 0), x_dir=(-1, 0, 0), z_dir=(0, -1, 0))):
        with Locations((-8.308181818, 81.75)):
            Rectangle(SKETCH39_W, SKETCH39_H)
        with Locations((-18.808181818, 81.75)):
            Rectangle(SKETCH39_W, SKETCH39_H)
    extrude(amount=-CUT_EXTRUDE25_DEPTH, mode=Mode.SUBTRACT)

    # Sketch40 → Boss-Extrude13 (add)
    with BuildSketch(Plane.XY.offset(76.5)):
        with Locations((13.558181818, 1.5)):
            Rectangle(SKETCH40_W, SKETCH40_H)
    extrude(amount=BOSS_EXTRUDE13_DEPTH)

    # Sketch41 → Cut-Extrude26 (cut)
    with BuildSketch(Plane(origin=(0, 3, 0), x_dir=(1, 0, 0), z_dir=(0, 1, 0))):
        with Locations((-6.691818182, -89.5)):
            Rectangle(SKETCH41_W, SKETCH41_H)
        with Locations((33.808181818, -89.5)):
            Rectangle(SKETCH41_W, SKETCH41_H)
        with Locations((13.558181818, -89.5)):
            Rectangle(SKETCH41_W, SKETCH41_H)
    extrude(amount=-CUT_EXTRUDE26_DEPTH, mode=Mode.SUBTRACT)

    # Sketch42 → Cut-Extrude30 (cut)
    with BuildSketch(Plane(origin=(0, 3, 0), x_dir=(1, 0, 0), z_dir=(0, 1, 0))):
        with Locations(Location((13.558181818, -2.5, 0), (0, 0, 270))):
            Circle(SKETCH42_R)
        with Locations(Location((30.558181818, 14.5, 0), (0, 0, 270))):
            Circle(SKETCH42_R_2)
        with Locations(Location((-3.441818182, 14.5, 0), (0, 0, 270))):
            Circle(SKETCH42_R_2)
        with Locations(Location((-3.441818182, -19.5, 0), (0, 0, 270))):
            Circle(SKETCH42_R_2)
        with Locations(Location((30.558181818, -19.5, 0), (0, 0, 270))):
            Circle(SKETCH42_R_2)
        Polygon((8.058181818, 14.75), (8.058181818, 11.194345135), (19.058181818, 11.194345135), (19.058181818, 14.75), (26.058181818, 14.75), (26.058181818, 7.75), (1.058181818, 7.75), (1.058181818, 14.75), align=None)
    extrude(amount=-CUT_EXTRUDE30_DEPTH, mode=Mode.SUBTRACT)


solid = part.part
